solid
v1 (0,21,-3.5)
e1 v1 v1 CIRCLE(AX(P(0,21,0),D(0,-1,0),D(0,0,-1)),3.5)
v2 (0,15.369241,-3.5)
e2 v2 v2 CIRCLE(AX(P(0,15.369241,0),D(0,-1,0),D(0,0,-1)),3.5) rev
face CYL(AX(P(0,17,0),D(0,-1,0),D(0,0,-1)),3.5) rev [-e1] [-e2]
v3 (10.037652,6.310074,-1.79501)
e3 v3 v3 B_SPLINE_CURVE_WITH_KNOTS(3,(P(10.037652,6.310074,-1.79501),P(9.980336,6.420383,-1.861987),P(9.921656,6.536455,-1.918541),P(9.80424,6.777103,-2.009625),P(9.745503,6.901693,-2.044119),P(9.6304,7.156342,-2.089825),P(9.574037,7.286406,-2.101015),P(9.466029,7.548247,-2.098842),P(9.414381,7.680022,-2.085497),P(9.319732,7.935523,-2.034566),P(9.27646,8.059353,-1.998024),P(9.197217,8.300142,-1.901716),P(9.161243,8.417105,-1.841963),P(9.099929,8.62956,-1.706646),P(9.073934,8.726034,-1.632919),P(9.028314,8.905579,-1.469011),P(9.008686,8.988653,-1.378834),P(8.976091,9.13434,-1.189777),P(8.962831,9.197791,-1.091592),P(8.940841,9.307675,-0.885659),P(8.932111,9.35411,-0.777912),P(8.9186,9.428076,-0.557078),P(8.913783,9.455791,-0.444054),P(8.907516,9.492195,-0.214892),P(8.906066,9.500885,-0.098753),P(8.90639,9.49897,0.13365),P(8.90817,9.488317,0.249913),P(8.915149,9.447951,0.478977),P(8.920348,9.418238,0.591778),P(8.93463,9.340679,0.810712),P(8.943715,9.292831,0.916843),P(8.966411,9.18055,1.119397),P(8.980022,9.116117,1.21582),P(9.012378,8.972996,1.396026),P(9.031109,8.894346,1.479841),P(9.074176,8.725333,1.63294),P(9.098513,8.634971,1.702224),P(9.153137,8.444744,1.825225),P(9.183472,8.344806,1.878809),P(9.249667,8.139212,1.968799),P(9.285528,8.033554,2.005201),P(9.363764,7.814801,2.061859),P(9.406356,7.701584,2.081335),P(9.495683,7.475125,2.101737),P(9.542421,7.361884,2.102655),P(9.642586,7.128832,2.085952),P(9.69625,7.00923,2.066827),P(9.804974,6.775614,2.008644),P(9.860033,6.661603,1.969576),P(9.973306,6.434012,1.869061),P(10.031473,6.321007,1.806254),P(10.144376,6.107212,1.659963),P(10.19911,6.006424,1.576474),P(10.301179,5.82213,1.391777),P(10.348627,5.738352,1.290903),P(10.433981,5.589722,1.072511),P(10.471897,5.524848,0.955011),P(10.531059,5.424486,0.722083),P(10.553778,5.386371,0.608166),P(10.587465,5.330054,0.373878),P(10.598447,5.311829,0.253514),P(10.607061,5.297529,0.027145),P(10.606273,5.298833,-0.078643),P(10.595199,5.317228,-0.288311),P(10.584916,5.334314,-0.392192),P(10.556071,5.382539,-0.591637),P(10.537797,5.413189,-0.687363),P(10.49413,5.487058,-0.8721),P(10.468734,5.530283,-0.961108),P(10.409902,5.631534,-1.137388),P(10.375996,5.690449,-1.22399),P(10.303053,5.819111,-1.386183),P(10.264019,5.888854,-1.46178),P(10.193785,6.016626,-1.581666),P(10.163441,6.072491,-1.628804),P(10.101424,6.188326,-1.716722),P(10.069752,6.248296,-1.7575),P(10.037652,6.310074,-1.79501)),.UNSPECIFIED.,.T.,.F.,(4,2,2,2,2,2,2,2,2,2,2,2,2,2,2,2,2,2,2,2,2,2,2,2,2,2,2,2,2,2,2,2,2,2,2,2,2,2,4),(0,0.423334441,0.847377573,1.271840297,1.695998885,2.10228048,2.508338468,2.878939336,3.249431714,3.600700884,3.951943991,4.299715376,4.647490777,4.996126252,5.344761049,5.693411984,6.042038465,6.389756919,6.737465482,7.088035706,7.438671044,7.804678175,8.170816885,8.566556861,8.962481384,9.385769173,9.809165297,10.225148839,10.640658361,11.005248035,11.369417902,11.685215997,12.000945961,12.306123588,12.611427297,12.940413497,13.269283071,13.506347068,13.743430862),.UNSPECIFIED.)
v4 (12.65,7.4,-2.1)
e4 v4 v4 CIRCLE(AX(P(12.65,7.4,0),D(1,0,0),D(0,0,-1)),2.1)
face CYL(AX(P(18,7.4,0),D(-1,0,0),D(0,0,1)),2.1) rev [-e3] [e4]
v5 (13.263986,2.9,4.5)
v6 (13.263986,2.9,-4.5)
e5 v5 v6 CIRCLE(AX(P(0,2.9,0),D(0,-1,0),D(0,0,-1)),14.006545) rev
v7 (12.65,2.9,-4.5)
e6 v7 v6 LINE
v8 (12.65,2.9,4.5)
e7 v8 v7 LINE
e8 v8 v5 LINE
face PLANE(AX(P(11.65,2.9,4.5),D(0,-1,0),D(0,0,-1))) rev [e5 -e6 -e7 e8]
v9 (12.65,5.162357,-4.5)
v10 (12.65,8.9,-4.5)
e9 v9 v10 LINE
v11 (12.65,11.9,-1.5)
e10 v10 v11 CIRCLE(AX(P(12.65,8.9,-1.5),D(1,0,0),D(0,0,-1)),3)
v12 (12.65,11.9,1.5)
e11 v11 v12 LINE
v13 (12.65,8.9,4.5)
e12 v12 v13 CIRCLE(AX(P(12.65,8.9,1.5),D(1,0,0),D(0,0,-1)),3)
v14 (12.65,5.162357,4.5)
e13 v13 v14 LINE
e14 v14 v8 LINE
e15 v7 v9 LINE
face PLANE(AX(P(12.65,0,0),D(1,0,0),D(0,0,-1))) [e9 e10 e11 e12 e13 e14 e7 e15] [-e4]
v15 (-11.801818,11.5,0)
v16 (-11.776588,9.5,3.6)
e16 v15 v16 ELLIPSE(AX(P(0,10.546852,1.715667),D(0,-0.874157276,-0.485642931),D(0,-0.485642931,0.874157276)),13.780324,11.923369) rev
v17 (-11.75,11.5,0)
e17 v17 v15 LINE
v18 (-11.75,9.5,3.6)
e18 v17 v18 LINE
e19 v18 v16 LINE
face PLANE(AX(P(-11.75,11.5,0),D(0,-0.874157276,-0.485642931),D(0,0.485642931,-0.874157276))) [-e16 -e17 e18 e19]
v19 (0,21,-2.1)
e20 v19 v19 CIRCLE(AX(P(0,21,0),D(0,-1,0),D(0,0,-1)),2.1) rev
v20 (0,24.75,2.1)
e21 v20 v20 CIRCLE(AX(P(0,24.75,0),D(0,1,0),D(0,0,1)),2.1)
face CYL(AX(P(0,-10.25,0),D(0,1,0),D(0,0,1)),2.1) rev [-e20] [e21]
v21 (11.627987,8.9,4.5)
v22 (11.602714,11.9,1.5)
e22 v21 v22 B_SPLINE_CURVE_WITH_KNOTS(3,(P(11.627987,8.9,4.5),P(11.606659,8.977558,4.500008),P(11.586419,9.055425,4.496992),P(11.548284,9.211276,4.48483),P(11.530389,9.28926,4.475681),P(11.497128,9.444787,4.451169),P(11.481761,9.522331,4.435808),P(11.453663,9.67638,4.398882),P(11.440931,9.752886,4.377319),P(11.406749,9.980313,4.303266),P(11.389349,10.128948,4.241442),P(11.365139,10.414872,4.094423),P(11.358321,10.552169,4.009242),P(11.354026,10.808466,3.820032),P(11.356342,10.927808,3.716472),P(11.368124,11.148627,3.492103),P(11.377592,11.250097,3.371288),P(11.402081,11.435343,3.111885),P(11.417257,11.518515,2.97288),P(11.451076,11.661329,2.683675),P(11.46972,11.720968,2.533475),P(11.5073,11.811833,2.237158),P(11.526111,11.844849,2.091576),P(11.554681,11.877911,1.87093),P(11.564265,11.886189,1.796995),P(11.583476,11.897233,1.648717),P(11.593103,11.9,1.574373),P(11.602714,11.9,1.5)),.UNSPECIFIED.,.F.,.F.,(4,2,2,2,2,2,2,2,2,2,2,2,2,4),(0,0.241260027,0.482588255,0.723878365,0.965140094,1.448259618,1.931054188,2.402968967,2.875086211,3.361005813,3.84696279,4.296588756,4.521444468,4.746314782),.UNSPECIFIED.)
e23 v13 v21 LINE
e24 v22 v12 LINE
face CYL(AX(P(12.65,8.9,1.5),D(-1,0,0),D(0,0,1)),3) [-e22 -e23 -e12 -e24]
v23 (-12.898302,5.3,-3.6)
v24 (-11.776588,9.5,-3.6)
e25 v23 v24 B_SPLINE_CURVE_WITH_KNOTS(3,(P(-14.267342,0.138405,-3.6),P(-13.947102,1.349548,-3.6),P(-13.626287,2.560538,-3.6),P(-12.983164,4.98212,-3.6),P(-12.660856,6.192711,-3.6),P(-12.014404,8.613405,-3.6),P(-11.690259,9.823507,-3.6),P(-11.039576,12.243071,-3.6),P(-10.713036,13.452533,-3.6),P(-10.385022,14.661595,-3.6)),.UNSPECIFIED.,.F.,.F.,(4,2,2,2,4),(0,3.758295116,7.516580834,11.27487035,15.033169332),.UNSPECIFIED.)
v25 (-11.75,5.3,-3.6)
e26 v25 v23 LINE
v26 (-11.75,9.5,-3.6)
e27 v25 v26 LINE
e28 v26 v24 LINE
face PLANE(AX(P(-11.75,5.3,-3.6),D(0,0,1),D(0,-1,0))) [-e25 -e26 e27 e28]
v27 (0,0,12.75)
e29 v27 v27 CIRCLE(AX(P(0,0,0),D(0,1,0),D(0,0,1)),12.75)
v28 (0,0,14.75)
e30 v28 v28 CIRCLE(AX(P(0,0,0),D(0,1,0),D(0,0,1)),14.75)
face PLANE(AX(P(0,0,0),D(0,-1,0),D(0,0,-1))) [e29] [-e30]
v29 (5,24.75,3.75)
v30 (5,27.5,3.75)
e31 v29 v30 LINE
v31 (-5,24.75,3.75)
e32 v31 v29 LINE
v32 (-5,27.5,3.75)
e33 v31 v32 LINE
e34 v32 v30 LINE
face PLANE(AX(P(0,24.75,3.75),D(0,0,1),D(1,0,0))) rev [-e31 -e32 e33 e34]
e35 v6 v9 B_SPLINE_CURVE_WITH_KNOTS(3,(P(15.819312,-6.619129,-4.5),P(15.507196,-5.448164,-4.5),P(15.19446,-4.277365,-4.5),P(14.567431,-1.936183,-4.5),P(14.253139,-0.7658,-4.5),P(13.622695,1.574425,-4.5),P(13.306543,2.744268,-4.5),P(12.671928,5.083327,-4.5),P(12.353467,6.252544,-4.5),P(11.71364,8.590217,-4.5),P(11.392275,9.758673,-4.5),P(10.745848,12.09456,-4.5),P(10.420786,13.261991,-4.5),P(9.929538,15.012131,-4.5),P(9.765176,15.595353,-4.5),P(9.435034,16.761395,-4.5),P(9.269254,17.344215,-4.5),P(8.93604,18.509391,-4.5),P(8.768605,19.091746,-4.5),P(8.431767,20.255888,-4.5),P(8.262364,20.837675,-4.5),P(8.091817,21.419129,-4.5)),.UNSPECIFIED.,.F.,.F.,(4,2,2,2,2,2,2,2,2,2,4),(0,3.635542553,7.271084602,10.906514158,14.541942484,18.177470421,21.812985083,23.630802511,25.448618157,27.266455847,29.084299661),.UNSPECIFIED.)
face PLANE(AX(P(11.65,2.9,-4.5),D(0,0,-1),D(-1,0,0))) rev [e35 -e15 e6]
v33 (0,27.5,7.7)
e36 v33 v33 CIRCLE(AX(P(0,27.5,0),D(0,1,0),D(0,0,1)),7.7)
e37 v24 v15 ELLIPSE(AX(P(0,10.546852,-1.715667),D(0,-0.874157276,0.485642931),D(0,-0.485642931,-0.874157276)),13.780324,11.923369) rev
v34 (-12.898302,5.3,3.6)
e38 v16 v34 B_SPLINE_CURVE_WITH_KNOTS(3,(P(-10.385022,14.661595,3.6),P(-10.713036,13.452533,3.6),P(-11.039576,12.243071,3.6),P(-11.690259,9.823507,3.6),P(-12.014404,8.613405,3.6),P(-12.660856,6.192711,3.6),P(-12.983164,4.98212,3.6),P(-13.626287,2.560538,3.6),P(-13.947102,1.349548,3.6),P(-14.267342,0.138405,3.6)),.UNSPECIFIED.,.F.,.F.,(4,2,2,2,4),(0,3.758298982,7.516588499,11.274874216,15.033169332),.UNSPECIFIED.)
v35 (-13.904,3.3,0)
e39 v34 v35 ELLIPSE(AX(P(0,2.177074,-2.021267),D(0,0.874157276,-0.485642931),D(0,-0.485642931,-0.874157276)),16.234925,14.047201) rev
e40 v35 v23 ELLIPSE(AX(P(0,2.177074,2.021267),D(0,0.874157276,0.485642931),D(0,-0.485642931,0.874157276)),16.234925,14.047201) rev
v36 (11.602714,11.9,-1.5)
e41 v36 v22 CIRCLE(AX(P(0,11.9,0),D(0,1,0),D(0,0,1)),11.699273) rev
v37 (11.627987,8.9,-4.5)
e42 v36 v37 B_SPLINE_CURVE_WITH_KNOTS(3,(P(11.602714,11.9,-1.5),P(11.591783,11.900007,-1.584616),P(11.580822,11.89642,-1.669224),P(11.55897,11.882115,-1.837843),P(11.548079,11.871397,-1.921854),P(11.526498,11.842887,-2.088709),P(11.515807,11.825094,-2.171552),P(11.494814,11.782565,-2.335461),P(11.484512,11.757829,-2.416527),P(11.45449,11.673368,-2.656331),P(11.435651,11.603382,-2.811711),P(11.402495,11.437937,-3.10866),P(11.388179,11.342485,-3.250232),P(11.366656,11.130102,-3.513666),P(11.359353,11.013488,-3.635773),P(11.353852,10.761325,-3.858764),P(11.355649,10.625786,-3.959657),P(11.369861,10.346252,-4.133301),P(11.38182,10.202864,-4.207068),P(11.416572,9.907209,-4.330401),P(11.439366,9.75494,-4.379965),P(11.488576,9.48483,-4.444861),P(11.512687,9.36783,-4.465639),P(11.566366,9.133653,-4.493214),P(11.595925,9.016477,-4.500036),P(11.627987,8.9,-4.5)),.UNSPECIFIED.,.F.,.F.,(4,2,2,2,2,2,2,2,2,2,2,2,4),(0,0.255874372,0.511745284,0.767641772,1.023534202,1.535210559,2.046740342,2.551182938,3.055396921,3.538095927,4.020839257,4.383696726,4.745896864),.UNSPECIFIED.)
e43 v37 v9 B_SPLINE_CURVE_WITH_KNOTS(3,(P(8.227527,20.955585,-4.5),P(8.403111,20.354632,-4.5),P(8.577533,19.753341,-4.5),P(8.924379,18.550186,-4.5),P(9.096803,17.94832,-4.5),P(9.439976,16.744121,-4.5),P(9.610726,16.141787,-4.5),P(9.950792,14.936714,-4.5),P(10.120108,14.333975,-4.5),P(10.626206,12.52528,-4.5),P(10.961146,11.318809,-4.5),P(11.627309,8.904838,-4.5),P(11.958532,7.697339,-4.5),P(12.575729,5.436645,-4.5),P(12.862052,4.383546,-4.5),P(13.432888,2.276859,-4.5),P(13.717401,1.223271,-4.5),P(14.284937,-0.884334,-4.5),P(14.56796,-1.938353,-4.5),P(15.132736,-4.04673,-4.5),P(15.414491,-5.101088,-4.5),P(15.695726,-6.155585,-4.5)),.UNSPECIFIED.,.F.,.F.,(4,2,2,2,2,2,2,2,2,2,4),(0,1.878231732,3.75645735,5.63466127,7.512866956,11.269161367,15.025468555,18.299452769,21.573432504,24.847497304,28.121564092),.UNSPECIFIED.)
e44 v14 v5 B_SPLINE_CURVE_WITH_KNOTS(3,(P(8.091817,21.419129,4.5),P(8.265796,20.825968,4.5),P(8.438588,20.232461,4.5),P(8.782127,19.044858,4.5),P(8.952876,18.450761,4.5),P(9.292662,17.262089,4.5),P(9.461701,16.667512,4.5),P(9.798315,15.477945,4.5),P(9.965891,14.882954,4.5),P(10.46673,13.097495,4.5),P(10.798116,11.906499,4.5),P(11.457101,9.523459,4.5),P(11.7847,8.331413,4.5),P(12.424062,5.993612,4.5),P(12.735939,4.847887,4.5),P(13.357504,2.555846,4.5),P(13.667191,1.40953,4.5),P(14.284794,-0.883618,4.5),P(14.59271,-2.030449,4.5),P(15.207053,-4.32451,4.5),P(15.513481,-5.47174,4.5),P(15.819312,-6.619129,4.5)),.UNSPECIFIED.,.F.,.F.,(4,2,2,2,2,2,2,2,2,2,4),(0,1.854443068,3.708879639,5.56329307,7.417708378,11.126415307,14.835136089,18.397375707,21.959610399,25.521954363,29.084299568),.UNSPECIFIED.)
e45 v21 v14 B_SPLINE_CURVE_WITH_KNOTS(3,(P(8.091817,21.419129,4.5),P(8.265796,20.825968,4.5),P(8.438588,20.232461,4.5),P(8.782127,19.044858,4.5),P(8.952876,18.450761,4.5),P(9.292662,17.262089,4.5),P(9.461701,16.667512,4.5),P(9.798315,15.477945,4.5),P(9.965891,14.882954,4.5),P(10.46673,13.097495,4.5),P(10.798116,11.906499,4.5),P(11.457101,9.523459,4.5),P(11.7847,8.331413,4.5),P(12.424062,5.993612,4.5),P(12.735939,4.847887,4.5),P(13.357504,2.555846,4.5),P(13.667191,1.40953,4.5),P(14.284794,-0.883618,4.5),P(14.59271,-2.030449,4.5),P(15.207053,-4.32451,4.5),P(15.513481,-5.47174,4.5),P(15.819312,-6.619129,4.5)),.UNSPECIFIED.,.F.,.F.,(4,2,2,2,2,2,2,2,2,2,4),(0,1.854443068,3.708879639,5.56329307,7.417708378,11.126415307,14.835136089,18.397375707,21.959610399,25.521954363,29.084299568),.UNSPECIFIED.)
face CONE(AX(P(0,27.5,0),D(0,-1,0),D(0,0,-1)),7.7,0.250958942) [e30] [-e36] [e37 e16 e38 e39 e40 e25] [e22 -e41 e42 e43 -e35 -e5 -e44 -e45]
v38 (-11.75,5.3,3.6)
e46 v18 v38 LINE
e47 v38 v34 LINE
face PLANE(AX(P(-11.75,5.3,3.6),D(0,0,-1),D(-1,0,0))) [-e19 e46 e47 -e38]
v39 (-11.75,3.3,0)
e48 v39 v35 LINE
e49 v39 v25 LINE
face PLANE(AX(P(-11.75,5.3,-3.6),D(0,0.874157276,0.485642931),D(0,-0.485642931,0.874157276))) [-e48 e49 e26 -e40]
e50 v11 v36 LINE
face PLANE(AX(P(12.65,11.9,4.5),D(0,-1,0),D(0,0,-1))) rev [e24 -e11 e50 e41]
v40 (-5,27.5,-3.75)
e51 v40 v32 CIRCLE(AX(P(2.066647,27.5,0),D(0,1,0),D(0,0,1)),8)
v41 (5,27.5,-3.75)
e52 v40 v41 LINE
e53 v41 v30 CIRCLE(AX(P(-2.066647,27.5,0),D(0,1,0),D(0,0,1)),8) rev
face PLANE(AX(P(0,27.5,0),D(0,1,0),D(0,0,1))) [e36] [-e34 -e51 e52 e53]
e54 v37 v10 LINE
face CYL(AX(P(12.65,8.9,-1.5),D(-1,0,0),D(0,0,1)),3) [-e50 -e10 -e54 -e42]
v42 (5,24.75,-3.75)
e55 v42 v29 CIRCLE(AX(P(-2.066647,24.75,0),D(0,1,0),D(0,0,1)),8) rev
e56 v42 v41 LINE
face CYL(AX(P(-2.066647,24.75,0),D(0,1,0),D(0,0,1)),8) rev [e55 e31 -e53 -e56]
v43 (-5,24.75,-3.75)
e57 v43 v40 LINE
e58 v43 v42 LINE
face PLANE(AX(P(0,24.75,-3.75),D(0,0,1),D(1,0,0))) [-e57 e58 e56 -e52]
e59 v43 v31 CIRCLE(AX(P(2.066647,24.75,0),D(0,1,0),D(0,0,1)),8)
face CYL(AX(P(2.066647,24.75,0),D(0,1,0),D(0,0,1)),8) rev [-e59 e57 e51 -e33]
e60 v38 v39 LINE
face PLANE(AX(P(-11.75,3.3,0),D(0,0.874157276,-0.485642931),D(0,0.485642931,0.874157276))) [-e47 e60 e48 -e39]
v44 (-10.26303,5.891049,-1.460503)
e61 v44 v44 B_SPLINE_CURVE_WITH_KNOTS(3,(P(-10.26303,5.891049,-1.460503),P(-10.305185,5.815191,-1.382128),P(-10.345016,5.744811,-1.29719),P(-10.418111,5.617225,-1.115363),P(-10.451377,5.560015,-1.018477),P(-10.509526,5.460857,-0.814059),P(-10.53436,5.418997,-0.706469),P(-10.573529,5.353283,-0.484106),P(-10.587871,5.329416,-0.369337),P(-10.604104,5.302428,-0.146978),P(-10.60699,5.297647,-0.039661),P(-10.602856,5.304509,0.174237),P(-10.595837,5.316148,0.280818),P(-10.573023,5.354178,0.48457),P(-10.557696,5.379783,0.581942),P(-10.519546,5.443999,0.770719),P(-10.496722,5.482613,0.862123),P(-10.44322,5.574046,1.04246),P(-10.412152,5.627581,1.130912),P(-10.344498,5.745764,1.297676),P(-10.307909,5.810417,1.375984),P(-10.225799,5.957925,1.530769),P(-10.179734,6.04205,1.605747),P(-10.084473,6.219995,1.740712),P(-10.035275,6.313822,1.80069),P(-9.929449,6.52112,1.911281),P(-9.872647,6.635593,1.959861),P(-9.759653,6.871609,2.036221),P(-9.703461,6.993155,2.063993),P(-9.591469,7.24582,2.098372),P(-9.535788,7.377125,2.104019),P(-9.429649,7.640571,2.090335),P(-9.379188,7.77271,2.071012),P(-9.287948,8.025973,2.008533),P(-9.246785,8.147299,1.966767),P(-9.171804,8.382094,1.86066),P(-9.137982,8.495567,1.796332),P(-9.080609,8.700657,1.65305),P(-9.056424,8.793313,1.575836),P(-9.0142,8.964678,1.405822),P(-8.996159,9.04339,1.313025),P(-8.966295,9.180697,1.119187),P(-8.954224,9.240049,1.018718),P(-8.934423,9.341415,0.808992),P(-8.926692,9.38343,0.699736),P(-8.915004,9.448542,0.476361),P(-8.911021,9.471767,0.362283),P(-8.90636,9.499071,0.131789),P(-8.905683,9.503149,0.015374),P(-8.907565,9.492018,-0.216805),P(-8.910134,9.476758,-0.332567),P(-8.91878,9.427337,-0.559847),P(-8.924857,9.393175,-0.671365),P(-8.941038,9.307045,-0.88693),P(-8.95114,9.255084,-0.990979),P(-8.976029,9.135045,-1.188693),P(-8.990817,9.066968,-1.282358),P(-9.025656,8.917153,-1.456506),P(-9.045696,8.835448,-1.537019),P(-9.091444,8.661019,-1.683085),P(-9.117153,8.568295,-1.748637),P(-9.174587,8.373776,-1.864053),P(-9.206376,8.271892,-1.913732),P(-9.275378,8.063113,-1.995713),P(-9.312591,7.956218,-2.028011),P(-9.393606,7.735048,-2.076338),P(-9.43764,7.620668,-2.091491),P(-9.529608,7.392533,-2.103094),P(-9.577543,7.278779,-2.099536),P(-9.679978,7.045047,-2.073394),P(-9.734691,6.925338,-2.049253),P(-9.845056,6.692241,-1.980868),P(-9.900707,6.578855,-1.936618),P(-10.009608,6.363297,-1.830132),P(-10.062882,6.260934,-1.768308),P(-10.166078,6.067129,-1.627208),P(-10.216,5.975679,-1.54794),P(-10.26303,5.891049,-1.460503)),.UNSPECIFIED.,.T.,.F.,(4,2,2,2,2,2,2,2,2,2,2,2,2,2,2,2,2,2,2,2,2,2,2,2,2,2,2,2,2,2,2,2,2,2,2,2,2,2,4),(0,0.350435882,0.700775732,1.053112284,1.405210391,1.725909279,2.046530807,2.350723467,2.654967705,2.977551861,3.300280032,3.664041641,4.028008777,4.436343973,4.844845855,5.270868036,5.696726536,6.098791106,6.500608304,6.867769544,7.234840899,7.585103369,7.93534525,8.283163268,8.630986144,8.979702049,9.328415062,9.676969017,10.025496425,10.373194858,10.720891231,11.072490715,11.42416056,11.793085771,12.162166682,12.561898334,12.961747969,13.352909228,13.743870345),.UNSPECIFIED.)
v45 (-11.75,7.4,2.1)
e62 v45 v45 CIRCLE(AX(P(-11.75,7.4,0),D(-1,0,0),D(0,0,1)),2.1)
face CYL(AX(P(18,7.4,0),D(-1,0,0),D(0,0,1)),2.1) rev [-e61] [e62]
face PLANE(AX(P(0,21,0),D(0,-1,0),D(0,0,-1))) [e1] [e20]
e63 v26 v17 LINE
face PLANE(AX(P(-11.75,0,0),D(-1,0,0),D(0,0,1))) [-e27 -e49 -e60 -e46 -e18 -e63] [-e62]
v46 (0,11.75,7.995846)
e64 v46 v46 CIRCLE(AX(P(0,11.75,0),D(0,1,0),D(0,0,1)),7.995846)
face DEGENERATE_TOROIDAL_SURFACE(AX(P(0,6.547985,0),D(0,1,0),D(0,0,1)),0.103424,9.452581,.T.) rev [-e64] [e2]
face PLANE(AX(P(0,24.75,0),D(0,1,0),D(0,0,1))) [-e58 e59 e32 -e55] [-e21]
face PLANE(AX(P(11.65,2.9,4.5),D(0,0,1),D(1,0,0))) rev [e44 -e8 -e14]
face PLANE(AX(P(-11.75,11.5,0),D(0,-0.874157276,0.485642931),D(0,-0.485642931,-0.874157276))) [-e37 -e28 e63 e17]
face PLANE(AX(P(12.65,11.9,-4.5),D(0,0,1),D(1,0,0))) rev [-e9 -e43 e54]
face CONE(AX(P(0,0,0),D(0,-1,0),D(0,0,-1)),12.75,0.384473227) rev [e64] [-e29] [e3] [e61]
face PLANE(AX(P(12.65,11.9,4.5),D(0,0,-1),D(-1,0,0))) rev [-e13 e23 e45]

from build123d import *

# Parameters (mm, degrees)
CUT_EXTRUDE1_DEPTH      = 18
CUT_EXTRUDE1_DEPTH_BACK = 18
SKETCH2_R               = 2.1
SKETCH3_W               = 9
SKETCH3_H               = 9
CUT_EXTRUDE4_DEPTH      = 3.1
SKETCH4_W               = 9
SKETCH4_H               = 9
SKETCH4_R               = 2.1
BOSS_EXTRUDE2_DEPTH     = 1
BOSS_EXTRUDE3_START     = -1.850787983
BOSS_EXTRUDE3_DEPTH     = 0.850787983
FILLET2_R               = 3
CUT_EXTRUDE5_DEPTH      = 3
SKETCH9_W               = 10
SKETCH9_H               = 7.5
SKETCH9_R               = 2.1
CUT_EXTRUDE6_DEPTH      = 2.75
SKETCH10_R              = 2.1
CUT_EXTRUDE7_DEPTH      = 37.75
SKETCH11_R              = 3.5
CUT_EXTRUDE8_DEPTH      = 17
SKETCH12_R              = 3.5
CUT_EXTRUDE9_DEPTH      = 4


# Read off the part's stored shape, not the designer's step: Boss-Extrude3
with BuildPart() as part:
    # Sketch1 → Revolve2 (revolve)
    with BuildSketch(Plane.XY, mode=Mode.PRIVATE) as revolve2_sk:
        with BuildLine():
            Line((0, 27.5), (0, 16))
            ThreePointArc((0, 16), (4.539948066, 14.894753), (7.995845625, 11.75))
            Line((7.995845625, 11.75), (9.755894266, 7.4))
            Line((9.755894266, 7.4), (12.75, 0))
            Line((12.75, 0), (14.75, 0))
            Line((14.75, 0), (7.7, 27.5))
            Line((7.7, 27.5), (0, 27.5))
        make_face()
    revolve(revolve2_sk.sketch.rotate(Axis((0, 27.5, 0), (0, -1, 0)), 90), axis=Axis((0, 27.5, 0), (0, -1, 0)))

    # Sketch2 → Cut-Extrude1 (cut, two sides: drawn at the far end of the back side and taken through both)
    with BuildSketch(Plane(origin=(0, 0, 0), x_dir=(0, 0, -1), z_dir=(1, 0, 0)).offset(-CUT_EXTRUDE1_DEPTH_BACK)):
        with Locations(Location((0, 7.4, 0), (0, 0, 322.555636433))):
            Circle(SKETCH2_R)
    extrude(amount=CUT_EXTRUDE1_DEPTH + CUT_EXTRUDE1_DEPTH_BACK, mode=Mode.SUBTRACT)

    # Sketch3 → Cut-Extrude4 (cut)
    with BuildSketch(Plane(origin=(14.75, 0, 0), x_dir=(0, 0, -1), z_dir=(1, 0, 0))):
        with Locations((0, 7.4)):
            Rectangle(SKETCH3_W, SKETCH3_H)
    extrude(amount=-CUT_EXTRUDE4_DEPTH, mode=Mode.SUBTRACT)

    # Sketch4 → Boss-Extrude2 (add)
    with BuildSketch(Plane(origin=(11.65, 0, 0), x_dir=(0, 0, -1), z_dir=(1, 0, 0))):
        with Locations((0, 7.4)):
            Rectangle(SKETCH4_W, SKETCH4_H)
        with Locations(Location((0, 7.4, 0), (0, 0, 328.733960859))):
            Circle(SKETCH4_R, mode=Mode.SUBTRACT)
    extrude(amount=BOSS_EXTRUDE2_DEPTH)

    # Boss-Extrude3 outline → Boss-Extrude3 (add)
    with BuildSketch(Plane(origin=(12.65, 0, 0), x_dir=(0, 0, -1), z_dir=(1, 0, 0)).offset(BOSS_EXTRUDE3_START)):
        with BuildLine():
            Line((1.769303732, 8.531178281), (4.5, 8.531178281))
            Line((4.5, 8.531178281), (4.5, 11.9))
            Line((4.5, 11.9), (-4.5, 11.9))
            Line((-4.5, 11.9), (-4.5, 8.531178281))
            Line((-4.5, 8.531178281), (-1.769303732, 8.531178281))
            ThreePointArc((-1.769303732, 8.531178281), (0, 9.5), (1.769303732, 8.531178281))
        make_face()
    extrude(amount=BOSS_EXTRUDE3_DEPTH)

    # Fillet2
    fillet2_edges = [part.edges().sort_by_distance(p)[0] for p in [
        (11.724606008, 11.9, -4.5),
        (11.724606008, 11.9, 4.5),
    ]]
    fillet(fillet2_edges, radius=FILLET2_R)

    # Sketch8 → Cut-Extrude5 (cut)
    with BuildSketch(Plane(origin=(-14.75, 0, 0), x_dir=(0, 0, -1), z_dir=(1, 0, 0))):
        Polygon((3.6, 5.3), (3.6, 9.5), (0, 11.5), (-3.6, 9.5), (-3.6, 5.3), (0, 3.3), align=None)
    extrude(amount=CUT_EXTRUDE5_DEPTH, mode=Mode.SUBTRACT)

    # Sketch9 → Cut-Extrude6 (cut)
    # profile 1 of 3: a face of its own
    with BuildSketch(Plane(origin=(0, 27.5, 0), x_dir=(1, 0, 0), z_dir=(0, 1, 0))):
        with BuildLine():
            Line((-5, -3.75), (-5, 3.75))
            ThreePointArc((-5, 3.75), (-5.933352987, 0), (-5, -3.75))
        make_face()
    # profile 2 of 3: a face of its own
    with BuildSketch(Plane(origin=(0, 27.5, 0), x_dir=(1, 0, 0), z_dir=(0, 1, 0))):
        Rectangle(SKETCH9_W, SKETCH9_H)
        with Locations(Location((0, 0, 0), (0, 0, 270))):
            Circle(SKETCH9_R, mode=Mode.SUBTRACT)
    # profile 3 of 3: a face of its own
    with BuildSketch(Plane(origin=(0, 27.5, 0), x_dir=(1, 0, 0), z_dir=(0, 1, 0))):
        with BuildLine():
            ThreePointArc((5, 3.75), (5.933352987, 0), (5, -3.75))
            Line((5, -3.75), (5, 3.75))
        make_face()
    extrude(amount=-CUT_EXTRUDE6_DEPTH, mode=Mode.SUBTRACT)

    # Sketch10 → Cut-Extrude7 (cut)
    with BuildSketch(Plane(origin=(0, 27.5, 0), x_dir=(1, 0, 0), z_dir=(0, 1, 0))):
        with Locations(Location((0, 0, 0), (0, 0, 270))):
            Circle(SKETCH10_R)
    extrude(amount=-CUT_EXTRUDE7_DEPTH, mode=Mode.SUBTRACT)

    # Sketch11 → Cut-Extrude8 (cut)
    with BuildSketch(Plane(origin=(0, 0, 0), x_dir=(-1, 0, 0), z_dir=(0, -1, 0))):
        with Locations(Location((0, 0, 0), (0, 0, 90))):
            Circle(SKETCH11_R)
    extrude(amount=-CUT_EXTRUDE8_DEPTH, mode=Mode.SUBTRACT)

    # Sketch12 → Cut-Extrude9 (cut)
    with BuildSketch(Plane(origin=(0, 17, 0), x_dir=(-1, 0, 0), z_dir=(0, -1, 0))):
        with Locations(Location((0, 0, 0), (0, 0, 90))):
            Circle(SKETCH12_R)
    extrude(amount=-CUT_EXTRUDE9_DEPTH, mode=Mode.SUBTRACT)


solid = part.part
